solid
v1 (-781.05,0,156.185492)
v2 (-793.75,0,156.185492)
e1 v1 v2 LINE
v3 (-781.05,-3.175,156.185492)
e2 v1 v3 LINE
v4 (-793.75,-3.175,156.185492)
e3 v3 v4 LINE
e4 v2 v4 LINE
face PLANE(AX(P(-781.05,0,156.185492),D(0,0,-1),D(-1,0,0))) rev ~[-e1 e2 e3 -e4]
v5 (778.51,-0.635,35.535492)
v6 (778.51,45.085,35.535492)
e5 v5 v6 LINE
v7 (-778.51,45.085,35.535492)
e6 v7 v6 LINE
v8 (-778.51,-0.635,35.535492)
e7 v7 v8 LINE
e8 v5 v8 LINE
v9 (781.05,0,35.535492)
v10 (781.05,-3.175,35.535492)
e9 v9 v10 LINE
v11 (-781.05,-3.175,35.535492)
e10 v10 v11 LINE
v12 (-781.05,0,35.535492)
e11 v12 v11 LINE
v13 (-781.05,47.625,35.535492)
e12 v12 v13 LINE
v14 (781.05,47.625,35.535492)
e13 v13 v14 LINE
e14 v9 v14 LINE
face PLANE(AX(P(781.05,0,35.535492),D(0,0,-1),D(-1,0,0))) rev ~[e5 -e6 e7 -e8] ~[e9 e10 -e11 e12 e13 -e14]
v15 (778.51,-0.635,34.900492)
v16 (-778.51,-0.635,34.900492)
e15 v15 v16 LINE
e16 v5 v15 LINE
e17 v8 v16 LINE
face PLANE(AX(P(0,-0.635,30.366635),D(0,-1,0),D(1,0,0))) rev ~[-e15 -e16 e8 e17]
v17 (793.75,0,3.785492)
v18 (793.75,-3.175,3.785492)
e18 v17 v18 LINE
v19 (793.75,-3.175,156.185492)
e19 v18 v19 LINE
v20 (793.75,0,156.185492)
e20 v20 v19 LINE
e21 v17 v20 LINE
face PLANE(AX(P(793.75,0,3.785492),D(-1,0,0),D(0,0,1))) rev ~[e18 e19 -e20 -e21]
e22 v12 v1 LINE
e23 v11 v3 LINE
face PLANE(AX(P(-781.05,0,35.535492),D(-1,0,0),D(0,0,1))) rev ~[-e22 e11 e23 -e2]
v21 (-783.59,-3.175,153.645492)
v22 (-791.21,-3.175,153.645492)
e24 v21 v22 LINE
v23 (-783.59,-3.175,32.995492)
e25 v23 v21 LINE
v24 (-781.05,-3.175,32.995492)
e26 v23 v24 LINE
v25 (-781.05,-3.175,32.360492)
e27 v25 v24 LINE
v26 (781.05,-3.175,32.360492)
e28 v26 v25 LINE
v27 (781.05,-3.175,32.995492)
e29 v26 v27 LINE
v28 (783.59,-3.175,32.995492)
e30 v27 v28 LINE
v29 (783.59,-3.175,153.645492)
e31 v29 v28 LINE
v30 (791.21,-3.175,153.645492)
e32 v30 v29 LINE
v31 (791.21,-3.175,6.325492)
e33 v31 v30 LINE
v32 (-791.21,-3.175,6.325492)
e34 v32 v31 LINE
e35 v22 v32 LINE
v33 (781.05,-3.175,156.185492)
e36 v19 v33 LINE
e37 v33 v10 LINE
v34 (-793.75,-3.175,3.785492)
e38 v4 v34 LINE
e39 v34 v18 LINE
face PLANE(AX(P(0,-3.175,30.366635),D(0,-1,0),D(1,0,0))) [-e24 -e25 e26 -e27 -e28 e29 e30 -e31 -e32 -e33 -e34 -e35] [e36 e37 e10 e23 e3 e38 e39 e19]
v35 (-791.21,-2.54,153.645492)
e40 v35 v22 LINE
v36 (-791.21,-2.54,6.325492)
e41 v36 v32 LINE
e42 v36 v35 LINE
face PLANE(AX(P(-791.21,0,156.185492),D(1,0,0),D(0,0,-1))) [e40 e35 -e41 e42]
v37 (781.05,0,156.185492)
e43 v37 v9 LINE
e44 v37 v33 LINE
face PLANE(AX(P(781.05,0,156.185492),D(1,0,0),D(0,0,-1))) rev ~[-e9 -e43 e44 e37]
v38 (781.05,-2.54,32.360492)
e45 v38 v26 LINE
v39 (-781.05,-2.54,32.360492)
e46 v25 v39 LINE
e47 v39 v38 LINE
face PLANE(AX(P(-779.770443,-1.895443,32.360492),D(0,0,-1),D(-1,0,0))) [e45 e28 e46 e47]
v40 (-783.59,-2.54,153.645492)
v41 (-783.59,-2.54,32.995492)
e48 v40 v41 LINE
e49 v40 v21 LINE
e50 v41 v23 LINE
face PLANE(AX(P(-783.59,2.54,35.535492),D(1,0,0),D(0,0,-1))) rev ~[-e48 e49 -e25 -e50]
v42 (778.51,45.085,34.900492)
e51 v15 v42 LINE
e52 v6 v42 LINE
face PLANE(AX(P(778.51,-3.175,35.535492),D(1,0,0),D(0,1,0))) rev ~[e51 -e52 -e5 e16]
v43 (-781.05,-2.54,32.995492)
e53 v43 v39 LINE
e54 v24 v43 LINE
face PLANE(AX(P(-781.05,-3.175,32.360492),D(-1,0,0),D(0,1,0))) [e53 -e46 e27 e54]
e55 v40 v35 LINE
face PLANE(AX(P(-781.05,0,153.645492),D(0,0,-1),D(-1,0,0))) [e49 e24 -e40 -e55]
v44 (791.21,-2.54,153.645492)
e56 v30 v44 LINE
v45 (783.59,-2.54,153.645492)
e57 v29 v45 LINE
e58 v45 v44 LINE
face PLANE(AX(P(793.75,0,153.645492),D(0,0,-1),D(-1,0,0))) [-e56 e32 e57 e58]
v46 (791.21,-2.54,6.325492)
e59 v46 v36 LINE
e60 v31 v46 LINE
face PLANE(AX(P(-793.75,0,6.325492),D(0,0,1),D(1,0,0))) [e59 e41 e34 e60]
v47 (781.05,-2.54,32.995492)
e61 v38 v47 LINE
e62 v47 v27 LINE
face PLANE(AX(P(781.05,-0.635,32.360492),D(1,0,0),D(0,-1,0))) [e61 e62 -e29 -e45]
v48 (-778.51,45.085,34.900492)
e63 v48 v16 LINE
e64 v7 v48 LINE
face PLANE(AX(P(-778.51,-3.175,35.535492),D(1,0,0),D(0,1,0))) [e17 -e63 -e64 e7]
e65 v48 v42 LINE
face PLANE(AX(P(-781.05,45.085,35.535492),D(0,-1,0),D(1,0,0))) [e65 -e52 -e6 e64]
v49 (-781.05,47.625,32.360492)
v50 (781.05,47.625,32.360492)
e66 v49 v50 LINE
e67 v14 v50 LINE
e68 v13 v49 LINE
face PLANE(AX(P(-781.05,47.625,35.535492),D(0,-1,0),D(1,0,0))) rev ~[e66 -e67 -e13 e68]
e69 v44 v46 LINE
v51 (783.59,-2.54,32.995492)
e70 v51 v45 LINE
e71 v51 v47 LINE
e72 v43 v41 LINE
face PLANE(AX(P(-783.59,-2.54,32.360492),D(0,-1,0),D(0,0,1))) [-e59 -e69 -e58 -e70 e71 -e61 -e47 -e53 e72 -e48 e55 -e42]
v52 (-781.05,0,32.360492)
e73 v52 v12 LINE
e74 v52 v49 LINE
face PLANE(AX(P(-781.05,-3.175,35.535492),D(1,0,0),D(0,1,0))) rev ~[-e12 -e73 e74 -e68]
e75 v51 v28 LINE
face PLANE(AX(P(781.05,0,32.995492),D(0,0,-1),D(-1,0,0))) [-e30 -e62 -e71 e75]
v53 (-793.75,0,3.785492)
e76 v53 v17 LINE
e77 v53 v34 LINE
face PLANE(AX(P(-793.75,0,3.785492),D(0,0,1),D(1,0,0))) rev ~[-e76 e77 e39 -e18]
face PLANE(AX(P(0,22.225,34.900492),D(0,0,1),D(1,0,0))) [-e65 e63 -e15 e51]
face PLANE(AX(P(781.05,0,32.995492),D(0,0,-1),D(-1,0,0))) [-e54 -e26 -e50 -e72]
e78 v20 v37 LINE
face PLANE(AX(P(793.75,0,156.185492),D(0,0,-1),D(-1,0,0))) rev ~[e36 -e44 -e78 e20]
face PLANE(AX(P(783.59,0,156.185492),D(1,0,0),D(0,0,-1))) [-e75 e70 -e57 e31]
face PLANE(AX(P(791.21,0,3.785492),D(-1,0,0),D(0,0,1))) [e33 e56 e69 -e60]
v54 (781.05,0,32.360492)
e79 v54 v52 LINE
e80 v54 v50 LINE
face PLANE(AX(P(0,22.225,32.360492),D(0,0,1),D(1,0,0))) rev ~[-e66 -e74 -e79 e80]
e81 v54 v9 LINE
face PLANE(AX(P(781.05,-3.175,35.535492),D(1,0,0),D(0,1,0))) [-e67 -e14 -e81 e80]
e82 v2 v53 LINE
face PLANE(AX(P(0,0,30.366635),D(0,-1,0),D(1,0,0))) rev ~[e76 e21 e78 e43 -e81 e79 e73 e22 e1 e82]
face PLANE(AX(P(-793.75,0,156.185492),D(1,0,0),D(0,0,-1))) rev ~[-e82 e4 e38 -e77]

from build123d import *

# Parameters (mm, degrees)
F1_DEPTH     = 3.175
F3_W         = 1562.1
F3_H         = 50.8
F4_DEPTH     = 3.175
F5_T         = 2.54
F5_T3_DEPTH  = 8.255
F5_T5_DEPTH  = 1567.18
F6_T         = 2.54
F6_T3_DEPTH  = 8.255
F6_T5_DEPTH  = 8.255
F6_T7_DEPTH  = 1567.18
F6_T9_DEPTH  = 5.715
F6_T11_DEPTH = 50.165
F6_T13_DEPTH = 5.715
F6_T15_DEPTH = 1562.1


# Not quite as in the source:
# - a shell that OpenCascade refuses in one call is made with other operations: the cavity is built on its own and cut out


with BuildPart() as f1:
    # F0 (on Front) → F1 (new body)
    with BuildSketch(Plane.XZ):
        Polygon((-781.05, 156.1854919385), (-793.75, 156.1854919385), (-793.75, 3.7854919385), (793.75, 3.7854919385), (793.75, 156.1854919385), (781.05, 156.1854919385), (781.05, 35.5354919385), (-781.05, 35.5354919385), align=None)
    extrude(amount=F1_DEPTH)

    # F3 (on face) → F4 (join)
    with BuildSketch(Plane.XY.offset(35.5354919385)):
        with Locations((0, 22.225)):
            Rectangle(F3_W, F3_H)
    extrude(amount=-F4_DEPTH)

    # F5: shell of thickness 2.54, made by hand


with BuildPart() as f5_core1:
    # F5_t2: copy of F1
    add(f1.part)

    # the walls: a layer under each face that stays
    f5_faces = [f5_core1.faces().sort_by_distance(p)[0] for p in [
        (-781.05, -1.5875, 95.8604919385),
        (-787.4, -1.5875, 156.1854919385),
        (-529.1666666667, 0, 29.1854919385),
        (-529.1666666667, -3.175, 29.1854919385),
        (781.05, -1.5875, 95.8604919385),
        (-793.75, -1.5875, 79.9854919385),
        (-781.05, 23.8125, 33.9479919385),
        (0, 23.8125, 32.3604919385),
        (781.05, 23.8125, 33.9479919385),
        (787.4, -1.5875, 156.1854919385),
        (793.75, -1.5875, 79.9854919385),
        (0, -1.5875, 3.7854919385),
        (0, 47.625, 33.9479919385),
    ]]
    thicken(f5_faces, amount=-F5_T, mode=Mode.SUBTRACT)

    # F5_s4 → F5_t3 (cut)
    with BuildSketch(Plane.XY.offset(29.8204919385)):
        Polygon((-781.0754, 0.0254), (-781.05, -2.54), (-778.51, -2.54), (-778.51, 0), align=None)
        Polygon((781.0754, 0.0254), (781.05, -2.54), (778.51, -2.54), (778.51, 0), align=None)
    extrude(amount=F5_T3_DEPTH, mode=Mode.SUBTRACT)

    # F5_s6 → F5_t5 (cut)
    with BuildSketch(Plane.YZ.offset(-783.59)):
        Polygon((0.0254, 32.3350919385), (-2.54, 32.3604919385), (-2.54, 34.9004919385), (0, 34.9004919385), align=None)
    extrude(amount=F5_T5_DEPTH, mode=Mode.SUBTRACT)


with BuildPart() as f1_1:
    add(f1.part)

    # what is left inside the walls is the cavity
    f5_cavity = [f5_core1.part.solids().sort_by_distance(p)[0] for p in [
        (0, 14.605, 34.925892),
    ]]
    add(f5_cavity, mode=Mode.SUBTRACT)

    # F6: shell of thickness 2.54, made by hand


with BuildPart() as f6_core1:
    # F6_t2: copy of F1
    add(f1_1.part)

    # the walls: a layer under each face that stays
    f6_faces = [f6_core1.faces().sort_by_distance(p)[0] for p in [
        (-781.05, -1.5875, 95.8604919385),
        (728.98, -1.4816666667, 35.5354919385),
        (-787.4, -1.5875, 156.1854919385),
        (-529.1666666667, 0, 29.1854919385),
        (781.05, -1.5875, 95.8604919385),
        (781.05, 23.8125, 33.9479919385),
        (0, 47.625, 33.9479919385),
        (-781.05, 23.8125, 33.9479919385),
        (778.51, 22.225, 35.2179919385),
        (0, -0.635, 35.2179919385),
        (-778.51, 22.225, 35.2179919385),
        (0, 45.085, 35.2179919385),
        (-793.75, -1.5875, 79.9854919385),
        (0, 23.8125, 32.3604919385),
        (787.4, -1.5875, 156.1854919385),
        (793.75, -1.5875, 79.9854919385),
        (0, -1.5875, 3.7854919385),
        (0, 22.225, 34.9004919385),
    ]]
    thicken(f6_faces, amount=-F6_T, mode=Mode.SUBTRACT)

    # F6_s4 → F6_t3 (cut)
    with BuildSketch(Plane.XZ.offset(-2.54)):
        Polygon((-781.0246, 35.5608919385), (-783.59, 35.5354919385), (-783.59, 32.9954919385), (-781.05, 32.9954919385), align=None)
        Polygon((781.0246, 35.5608919385), (781.05, 32.9954919385), (783.59, 32.9954919385), (783.59, 35.5354919385), align=None)
    extrude(amount=F6_T3_DEPTH, mode=Mode.SUBTRACT)

    # F6_s6 → F6_t5 (cut)
    with BuildSketch(Plane.XY.offset(29.8204919385)):
        Polygon((-781.0754, 0.0254), (-781.05, -2.54), (-778.51, -2.54), (-778.51, 0), align=None)
        Polygon((781.0754, 0.0254), (781.05, -2.54), (778.51, -2.54), (778.51, 0), align=None)
    extrude(amount=F6_T5_DEPTH, mode=Mode.SUBTRACT)

    # F6_s8 → F6_t7 (cut)
    with BuildSketch(Plane.YZ.offset(-783.59)):
        Polygon((0.0254, 32.3350919385), (-2.54, 32.3604919385), (-2.54, 34.9004919385), (0, 34.9004919385), align=None)
    extrude(amount=F6_T7_DEPTH, mode=Mode.SUBTRACT)

    # F6_s10 → F6_t9 (cut)
    with BuildSketch(Plane.XY.offset(32.3604919385)):
        Polygon((778.4846, 45.0596), (781.05, 45.085), (781.05, 47.625), (778.51, 47.625), align=None)
        Polygon((778.4846, -0.6096), (781.05, -0.635), (781.05, -3.175), (778.51, -3.175), align=None)
        Polygon((-778.4846, -0.6096), (-778.51, -3.175), (-781.05, -3.175), (-781.05, -0.635), align=None)
        Polygon((-778.4846, 45.0596), (-781.05, 45.085), (-781.05, 47.625), (-778.51, 47.625), align=None)
    extrude(amount=F6_T9_DEPTH, mode=Mode.SUBTRACT)

    # F6_s12 → F6_t11 (cut)
    with BuildSketch(Plane.XZ.offset(-47.625)):
        Polygon((778.4846, 34.9258919385), (781.05, 34.9004919385), (781.05, 32.3604919385), (778.51, 32.3604919385), align=None)
        Polygon((-778.4846, 34.9258919385), (-781.05, 34.9004919385), (-781.05, 32.3604919385), (-778.51, 32.3604919385), align=None)
    extrude(amount=F6_T11_DEPTH, mode=Mode.SUBTRACT)

    # F6_s14 → F6_t13 (cut)
    with BuildSketch(Plane.XZ.offset(-2.54)):
        Polygon((778.4846, 34.9258919385), (781.05, 34.9004919385), (781.05, 32.3604919385), (778.51, 32.3604919385), align=None)
        Polygon((-778.4846, 34.9258919385), (-781.05, 34.9004919385), (-781.05, 32.3604919385), (-778.51, 32.3604919385), align=None)
    extrude(amount=F6_T13_DEPTH, mode=Mode.SUBTRACT)

    # F6_s16 → F6_t15 (cut)
    with BuildSketch(Plane.YZ.offset(-781.05)):
        Polygon((-0.6096, 34.9258919385), (-3.175, 34.9004919385), (-3.175, 32.3604919385), (-0.635, 32.3604919385), align=None)
        Polygon((45.0596, 34.9258919385), (47.625, 34.9004919385), (47.625, 32.3604919385), (45.085, 32.3604919385), align=None)
    extrude(amount=F6_T15_DEPTH, mode=Mode.SUBTRACT)


with BuildPart() as f1_2:
    add(f1_1.part)

    # what is left inside the walls is the cavity
    f6_cavity = [f6_core1.part.solids().sort_by_distance(p)[0] for p in [
        (395.605, -2.5654, 22.694381),
    ]]
    add(f6_cavity, mode=Mode.SUBTRACT)


solid = f1_2.part
